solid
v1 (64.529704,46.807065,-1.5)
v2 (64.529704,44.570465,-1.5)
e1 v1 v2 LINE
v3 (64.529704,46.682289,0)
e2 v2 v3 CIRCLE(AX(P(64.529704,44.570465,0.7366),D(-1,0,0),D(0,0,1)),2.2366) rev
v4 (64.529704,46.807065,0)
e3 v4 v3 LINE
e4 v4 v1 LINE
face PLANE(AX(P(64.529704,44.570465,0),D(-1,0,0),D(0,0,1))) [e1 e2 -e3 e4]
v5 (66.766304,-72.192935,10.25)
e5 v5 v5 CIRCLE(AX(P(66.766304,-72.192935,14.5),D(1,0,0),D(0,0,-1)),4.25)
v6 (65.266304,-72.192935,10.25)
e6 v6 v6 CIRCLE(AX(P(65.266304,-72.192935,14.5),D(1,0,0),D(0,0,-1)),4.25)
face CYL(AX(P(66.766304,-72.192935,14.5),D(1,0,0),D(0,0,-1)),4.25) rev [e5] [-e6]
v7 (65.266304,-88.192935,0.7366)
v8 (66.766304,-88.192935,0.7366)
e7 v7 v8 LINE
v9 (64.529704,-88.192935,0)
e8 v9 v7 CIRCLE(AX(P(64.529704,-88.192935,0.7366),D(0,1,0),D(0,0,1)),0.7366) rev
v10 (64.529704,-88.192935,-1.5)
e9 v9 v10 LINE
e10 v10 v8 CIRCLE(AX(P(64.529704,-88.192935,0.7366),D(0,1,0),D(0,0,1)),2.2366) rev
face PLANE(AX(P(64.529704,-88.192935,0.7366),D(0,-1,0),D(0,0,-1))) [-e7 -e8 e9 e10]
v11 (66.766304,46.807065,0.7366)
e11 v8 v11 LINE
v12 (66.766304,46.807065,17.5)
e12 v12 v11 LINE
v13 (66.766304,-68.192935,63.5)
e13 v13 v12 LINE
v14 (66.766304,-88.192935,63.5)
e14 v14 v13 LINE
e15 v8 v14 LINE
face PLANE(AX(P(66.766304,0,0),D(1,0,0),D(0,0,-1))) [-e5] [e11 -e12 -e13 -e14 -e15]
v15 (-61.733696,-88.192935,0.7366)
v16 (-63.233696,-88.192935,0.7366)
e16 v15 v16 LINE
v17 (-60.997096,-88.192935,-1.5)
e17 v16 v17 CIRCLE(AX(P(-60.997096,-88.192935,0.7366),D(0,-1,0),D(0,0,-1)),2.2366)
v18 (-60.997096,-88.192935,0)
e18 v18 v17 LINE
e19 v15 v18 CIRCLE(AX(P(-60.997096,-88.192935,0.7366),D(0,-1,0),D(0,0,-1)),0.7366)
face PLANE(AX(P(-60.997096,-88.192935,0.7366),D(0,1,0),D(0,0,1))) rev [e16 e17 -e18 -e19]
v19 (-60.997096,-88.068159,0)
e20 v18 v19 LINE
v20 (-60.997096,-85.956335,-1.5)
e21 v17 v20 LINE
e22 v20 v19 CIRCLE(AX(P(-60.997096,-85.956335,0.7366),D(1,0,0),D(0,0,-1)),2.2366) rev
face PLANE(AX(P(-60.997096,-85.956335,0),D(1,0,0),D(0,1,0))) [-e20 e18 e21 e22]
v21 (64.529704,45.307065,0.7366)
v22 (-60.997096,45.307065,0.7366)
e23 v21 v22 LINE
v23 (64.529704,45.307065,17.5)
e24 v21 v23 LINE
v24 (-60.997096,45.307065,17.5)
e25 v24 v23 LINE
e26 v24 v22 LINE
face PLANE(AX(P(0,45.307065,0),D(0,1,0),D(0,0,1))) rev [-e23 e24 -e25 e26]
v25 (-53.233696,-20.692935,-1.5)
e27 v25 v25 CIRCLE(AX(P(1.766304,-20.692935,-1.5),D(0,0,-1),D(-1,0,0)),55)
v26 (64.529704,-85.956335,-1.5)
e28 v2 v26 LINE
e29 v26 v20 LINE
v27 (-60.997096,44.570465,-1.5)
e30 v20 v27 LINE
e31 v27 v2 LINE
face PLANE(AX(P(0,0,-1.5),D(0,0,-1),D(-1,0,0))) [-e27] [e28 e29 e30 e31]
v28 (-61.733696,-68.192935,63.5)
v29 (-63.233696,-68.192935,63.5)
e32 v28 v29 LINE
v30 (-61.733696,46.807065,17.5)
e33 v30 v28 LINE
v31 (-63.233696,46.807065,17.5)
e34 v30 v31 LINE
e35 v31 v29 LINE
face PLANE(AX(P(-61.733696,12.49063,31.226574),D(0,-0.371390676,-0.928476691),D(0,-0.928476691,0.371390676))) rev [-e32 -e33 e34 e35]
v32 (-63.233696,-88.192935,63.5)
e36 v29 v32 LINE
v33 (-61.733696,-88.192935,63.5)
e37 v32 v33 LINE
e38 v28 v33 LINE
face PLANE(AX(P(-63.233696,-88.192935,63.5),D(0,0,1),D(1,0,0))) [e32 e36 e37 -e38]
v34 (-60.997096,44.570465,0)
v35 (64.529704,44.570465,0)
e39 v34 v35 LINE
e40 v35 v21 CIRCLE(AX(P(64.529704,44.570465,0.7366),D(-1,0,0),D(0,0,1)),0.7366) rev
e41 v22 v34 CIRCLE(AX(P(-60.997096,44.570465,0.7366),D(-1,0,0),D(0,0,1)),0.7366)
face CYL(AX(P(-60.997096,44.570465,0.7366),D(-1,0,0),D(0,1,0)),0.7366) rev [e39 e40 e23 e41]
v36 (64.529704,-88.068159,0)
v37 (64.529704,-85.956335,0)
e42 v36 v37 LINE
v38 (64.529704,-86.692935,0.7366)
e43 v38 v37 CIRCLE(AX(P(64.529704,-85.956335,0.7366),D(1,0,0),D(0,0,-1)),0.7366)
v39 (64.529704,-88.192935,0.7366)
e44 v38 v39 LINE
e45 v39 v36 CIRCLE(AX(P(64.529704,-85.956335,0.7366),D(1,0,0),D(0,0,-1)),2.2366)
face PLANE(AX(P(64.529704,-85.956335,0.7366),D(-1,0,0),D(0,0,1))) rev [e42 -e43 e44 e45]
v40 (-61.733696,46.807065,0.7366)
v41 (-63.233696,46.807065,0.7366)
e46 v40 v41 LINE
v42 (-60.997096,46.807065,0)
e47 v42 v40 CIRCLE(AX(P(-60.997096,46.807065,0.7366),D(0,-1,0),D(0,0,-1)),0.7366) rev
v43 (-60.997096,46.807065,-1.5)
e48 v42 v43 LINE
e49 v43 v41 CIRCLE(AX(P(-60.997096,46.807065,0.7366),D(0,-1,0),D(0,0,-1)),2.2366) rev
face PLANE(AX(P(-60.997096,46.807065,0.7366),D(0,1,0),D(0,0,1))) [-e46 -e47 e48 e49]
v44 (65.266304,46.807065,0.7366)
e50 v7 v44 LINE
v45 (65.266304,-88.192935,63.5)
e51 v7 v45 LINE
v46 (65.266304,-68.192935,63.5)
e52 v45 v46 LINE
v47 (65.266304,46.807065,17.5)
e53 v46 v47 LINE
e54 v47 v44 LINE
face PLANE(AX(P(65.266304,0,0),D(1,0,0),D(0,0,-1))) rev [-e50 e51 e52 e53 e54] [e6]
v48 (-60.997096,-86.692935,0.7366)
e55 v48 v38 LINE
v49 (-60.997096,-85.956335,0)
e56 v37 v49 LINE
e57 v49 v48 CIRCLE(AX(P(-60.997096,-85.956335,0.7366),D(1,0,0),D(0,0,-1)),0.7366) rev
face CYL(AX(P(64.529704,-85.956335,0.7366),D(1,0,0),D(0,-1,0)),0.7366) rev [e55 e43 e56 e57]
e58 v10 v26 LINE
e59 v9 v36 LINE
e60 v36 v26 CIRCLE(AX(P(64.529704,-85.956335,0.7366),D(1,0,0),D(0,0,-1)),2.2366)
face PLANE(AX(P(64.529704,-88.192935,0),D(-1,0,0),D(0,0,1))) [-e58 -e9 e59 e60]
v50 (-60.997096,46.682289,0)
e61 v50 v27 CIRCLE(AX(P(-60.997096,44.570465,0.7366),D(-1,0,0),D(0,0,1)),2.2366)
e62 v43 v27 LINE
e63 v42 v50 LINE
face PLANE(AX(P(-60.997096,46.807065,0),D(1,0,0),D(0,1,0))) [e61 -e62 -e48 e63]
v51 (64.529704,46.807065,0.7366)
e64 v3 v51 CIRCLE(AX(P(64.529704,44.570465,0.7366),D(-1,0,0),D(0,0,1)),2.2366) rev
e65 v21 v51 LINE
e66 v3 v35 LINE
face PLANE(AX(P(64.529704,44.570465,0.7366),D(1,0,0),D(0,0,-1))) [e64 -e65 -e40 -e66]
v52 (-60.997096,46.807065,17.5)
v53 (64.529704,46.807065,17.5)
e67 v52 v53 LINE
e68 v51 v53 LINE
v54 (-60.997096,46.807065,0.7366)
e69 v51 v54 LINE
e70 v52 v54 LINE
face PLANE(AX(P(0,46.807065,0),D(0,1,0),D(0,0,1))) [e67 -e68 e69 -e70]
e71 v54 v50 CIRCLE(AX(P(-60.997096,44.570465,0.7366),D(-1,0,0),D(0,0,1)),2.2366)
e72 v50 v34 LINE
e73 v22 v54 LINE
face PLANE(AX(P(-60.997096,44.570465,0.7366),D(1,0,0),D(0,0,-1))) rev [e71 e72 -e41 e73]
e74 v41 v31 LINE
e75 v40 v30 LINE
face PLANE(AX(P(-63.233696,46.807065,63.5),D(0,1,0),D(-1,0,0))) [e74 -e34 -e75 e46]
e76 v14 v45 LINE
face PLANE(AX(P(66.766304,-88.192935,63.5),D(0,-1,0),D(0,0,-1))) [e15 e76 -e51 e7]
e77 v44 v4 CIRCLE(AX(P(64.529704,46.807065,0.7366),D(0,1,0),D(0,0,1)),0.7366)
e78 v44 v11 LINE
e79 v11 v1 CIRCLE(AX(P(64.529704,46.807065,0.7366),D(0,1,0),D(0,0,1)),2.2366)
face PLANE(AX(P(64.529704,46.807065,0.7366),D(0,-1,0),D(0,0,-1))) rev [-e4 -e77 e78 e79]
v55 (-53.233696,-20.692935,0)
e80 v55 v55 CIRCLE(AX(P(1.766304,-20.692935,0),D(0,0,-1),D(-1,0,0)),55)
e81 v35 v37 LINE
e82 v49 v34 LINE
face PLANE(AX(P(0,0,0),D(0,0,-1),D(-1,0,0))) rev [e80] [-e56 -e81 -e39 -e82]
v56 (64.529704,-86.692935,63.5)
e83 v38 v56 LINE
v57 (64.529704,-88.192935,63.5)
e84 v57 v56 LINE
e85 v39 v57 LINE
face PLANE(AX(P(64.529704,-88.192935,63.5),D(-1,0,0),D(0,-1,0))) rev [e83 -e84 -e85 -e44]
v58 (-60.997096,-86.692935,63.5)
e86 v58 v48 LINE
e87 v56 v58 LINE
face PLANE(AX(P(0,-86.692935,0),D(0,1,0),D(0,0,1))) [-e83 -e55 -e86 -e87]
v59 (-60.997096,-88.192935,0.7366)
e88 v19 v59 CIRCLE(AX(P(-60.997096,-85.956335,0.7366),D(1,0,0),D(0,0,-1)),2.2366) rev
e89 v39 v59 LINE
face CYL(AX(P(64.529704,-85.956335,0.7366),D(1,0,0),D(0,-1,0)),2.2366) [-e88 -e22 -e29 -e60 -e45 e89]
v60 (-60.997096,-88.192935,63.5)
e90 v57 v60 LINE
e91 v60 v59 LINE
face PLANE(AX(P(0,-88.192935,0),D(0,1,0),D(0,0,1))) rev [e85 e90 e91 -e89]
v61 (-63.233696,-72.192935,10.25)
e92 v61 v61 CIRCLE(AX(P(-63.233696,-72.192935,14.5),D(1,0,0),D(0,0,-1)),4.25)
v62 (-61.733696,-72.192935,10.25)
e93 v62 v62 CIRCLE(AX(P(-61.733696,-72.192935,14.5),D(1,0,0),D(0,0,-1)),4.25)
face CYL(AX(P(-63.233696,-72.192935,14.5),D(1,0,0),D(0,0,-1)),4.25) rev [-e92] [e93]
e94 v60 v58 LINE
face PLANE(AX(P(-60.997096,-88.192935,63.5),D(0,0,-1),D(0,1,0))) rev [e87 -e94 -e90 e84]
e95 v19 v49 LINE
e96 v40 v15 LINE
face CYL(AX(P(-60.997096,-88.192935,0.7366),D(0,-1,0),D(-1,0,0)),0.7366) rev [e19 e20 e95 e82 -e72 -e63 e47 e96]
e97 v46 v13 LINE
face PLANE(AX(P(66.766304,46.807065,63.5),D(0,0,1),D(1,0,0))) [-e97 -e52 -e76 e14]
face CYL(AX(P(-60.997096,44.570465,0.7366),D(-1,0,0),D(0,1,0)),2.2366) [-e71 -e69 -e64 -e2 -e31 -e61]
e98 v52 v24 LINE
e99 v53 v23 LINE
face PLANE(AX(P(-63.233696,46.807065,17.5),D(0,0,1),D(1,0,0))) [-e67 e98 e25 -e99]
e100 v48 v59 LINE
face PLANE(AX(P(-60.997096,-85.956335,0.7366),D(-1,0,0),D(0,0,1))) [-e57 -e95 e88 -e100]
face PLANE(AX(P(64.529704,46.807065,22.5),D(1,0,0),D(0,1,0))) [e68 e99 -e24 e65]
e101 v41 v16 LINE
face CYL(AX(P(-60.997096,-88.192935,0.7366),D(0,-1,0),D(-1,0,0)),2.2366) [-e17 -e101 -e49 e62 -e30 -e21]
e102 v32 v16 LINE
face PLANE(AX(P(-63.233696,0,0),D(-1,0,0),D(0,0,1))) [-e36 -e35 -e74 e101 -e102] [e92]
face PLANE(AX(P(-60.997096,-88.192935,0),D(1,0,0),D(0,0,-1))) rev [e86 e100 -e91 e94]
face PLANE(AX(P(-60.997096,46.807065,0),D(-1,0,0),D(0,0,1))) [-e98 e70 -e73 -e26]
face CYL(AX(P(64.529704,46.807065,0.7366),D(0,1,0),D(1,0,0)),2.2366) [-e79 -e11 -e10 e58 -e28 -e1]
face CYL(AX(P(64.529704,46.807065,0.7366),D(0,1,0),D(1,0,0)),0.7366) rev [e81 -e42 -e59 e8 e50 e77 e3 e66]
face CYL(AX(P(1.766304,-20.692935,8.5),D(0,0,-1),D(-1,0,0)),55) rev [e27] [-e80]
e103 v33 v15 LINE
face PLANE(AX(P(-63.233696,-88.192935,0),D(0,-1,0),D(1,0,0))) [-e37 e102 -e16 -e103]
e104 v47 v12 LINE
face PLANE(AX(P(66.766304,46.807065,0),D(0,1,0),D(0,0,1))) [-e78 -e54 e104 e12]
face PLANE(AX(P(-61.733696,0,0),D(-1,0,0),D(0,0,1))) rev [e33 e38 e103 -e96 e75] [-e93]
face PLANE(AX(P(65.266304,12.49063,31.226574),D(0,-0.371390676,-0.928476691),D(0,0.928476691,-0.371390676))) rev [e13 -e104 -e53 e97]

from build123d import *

# Parameters (mm, degrees)
SKETCH1_W                    = 130
SKETCH1_H                    = 135
BASE_FLANGE2_DEPTH           = 1.5
EDGE_FLANGE5_STRIP_W         = 7.4732
EDGE_FLANGE5_STRIP_H         = 1.5
EDGE_FLANGE5_STRIP_CUT_DEPTH = 135
EDGE_FLANGE5_DEPTH           = 135
EDGE_FLANGE6_STRIP_W         = 7.4732
EDGE_FLANGE6_STRIP_H         = 1.5
EDGE_FLANGE6_STRIP_CUT_DEPTH = 135
EDGE_FLANGE6_DEPTH           = 135
EDGE_FLANGE7_STRIP_W         = 7.4732
EDGE_FLANGE7_STRIP_H         = 1.5
EDGE_FLANGE7_STRIP_CUT_DEPTH = 125.5268
EDGE_FLANGE7_DEPTH           = 125.5268
CUT_EXTRUDE1_START           = -130
CUT_EXTRUDE1_OUTLINE_R       = 4.25
CUT_EXTRUDE1_DEPTH           = 130
CUT_EXTRUDE1_START_2         = -127.7634
CUT_EXTRUDE1_2_DEPTH         = 125.5268
SKETCH39_R                   = 55
CUT_EXTRUDE2_DEPTH           = 10
EDGE_FLANGE8_STRIP_W         = 7.4732
EDGE_FLANGE8_STRIP_H         = 1.5
EDGE_FLANGE8_STRIP_CUT_DEPTH = 125.5268
EDGE_FLANGE8_DEPTH           = 125.5268


# Read off the part's stored shape, not the designer's step: Cut-Extrude1
# Sheet-metal steps are written as plain solids
with BuildPart() as part:
    # Sketch1 → Base-Flange2 (new body)
    with BuildSketch(Plane.XY):
        with Locations((1.766304348, -20.692934783)):
            Rectangle(SKETCH1_W, SKETCH1_H)
    extrude(amount=-BASE_FLANGE2_DEPTH)

    # Edge-Flange5 strip (across the edge) → Edge-Flange5 strip cut (cut)
    with BuildSketch(Plane(origin=(66.766304348, -88.192934783, 0), x_dir=(-1, 0, 0), z_dir=(0, 1, 0))):
        with Locations((-1.5, -0.75)):
            Rectangle(EDGE_FLANGE5_STRIP_W, EDGE_FLANGE5_STRIP_H)
    extrude(amount=EDGE_FLANGE5_STRIP_CUT_DEPTH, mode=Mode.SUBTRACT)

    # Edge-Flange5 section (across the edge) → Edge-Flange5 (add)
    with BuildSketch(Plane(origin=(66.766304348, -88.192934783, 0), x_dir=(-1, 0, 0), z_dir=(0, 1, 0))):
        with BuildLine():
            Line((0, 0.7366), (0, 63.5))
            Line((0, 63.5), (1.5, 63.5))
            Line((1.5, 63.5), (1.5, 0.7366))
            ThreePointArc((1.5, 0.7366), (1.715745145, 0.215745145), (2.2366, 0))
            Line((2.2366, 0), (2.2366, -1.5))
            ThreePointArc((2.2366, -1.5), (0.655084973, -0.844915027), (0, 0.7366))
        make_face()
    extrude(amount=EDGE_FLANGE5_DEPTH)

    # Edge-Flange6 strip (across the edge) → Edge-Flange6 strip cut (cut)
    with BuildSketch(Plane(origin=(-63.233695652, 46.807065217, 0), x_dir=(1, 0, 0), z_dir=(0, -1, 0))):
        with Locations((-1.5, -0.75)):
            Rectangle(EDGE_FLANGE6_STRIP_W, EDGE_FLANGE6_STRIP_H)
    extrude(amount=EDGE_FLANGE6_STRIP_CUT_DEPTH, mode=Mode.SUBTRACT)

    # Edge-Flange6 section (across the edge) → Edge-Flange6 (add)
    with BuildSketch(Plane(origin=(-63.233695652, 46.807065217, 0), x_dir=(1, 0, 0), z_dir=(0, -1, 0))):
        with BuildLine():
            Line((0, 0.7366), (0, 63.5))
            Line((0, 63.5), (1.5, 63.5))
            Line((1.5, 63.5), (1.5, 0.7366))
            ThreePointArc((1.5, 0.7366), (1.715745145, 0.215745145), (2.2366, 0))
            Line((2.2366, 0), (2.2366, -1.5))
            ThreePointArc((2.2366, -1.5), (0.655084973, -0.844915027), (0, 0.7366))
        make_face()
    extrude(amount=EDGE_FLANGE6_DEPTH)

    # Edge-Flange7 strip (across the edge) → Edge-Flange7 strip cut (cut)
    with BuildSketch(Plane(origin=(64.529704348, 46.807065217, 0), x_dir=(0, -1, 0), z_dir=(-1, 0, 0))):
        with Locations((-1.5, -0.75)):
            Rectangle(EDGE_FLANGE7_STRIP_W, EDGE_FLANGE7_STRIP_H)
    extrude(amount=EDGE_FLANGE7_STRIP_CUT_DEPTH, mode=Mode.SUBTRACT)

    # Edge-Flange7 section (across the edge) → Edge-Flange7 (add)
    with BuildSketch(Plane(origin=(64.529704348, 46.807065217, 0), x_dir=(0, -1, 0), z_dir=(-1, 0, 0))):
        with BuildLine():
            Line((0, 0.7366), (0, 22.5))
            Line((0, 22.5), (1.5, 22.5))
            Line((1.5, 22.5), (1.5, 0.7366))
            ThreePointArc((1.5, 0.7366), (1.715745145, 0.215745145), (2.2366, 0))
            Line((2.2366, 0), (2.2366, -1.5))
            ThreePointArc((2.2366, -1.5), (0.655084973, -0.844915027), (0, 0.7366))
        make_face()
    extrude(amount=EDGE_FLANGE7_DEPTH)

    # Cut-Extrude1 outline → Cut-Extrude1 (cut)
    with BuildSketch(Plane(origin=(66.766304348, 0, 0), x_dir=(0, 0, -1), z_dir=(1, 0, 0)).offset(CUT_EXTRUDE1_START)):
        with Locations((-14.5, -72.192934783)):
            Circle(CUT_EXTRUDE1_OUTLINE_R)
        Polygon((-17.5, 46.807065217), (-63.5, 46.807065217), (-63.5, -68.192934783), align=None)
    extrude(amount=CUT_EXTRUDE1_DEPTH, mode=Mode.SUBTRACT)

    # Cut-Extrude1 2 outline → Cut-Extrude1 2 (cut)
    with BuildSketch(Plane(origin=(66.766304348, 0, 0), x_dir=(0, 0, -1), z_dir=(1, 0, 0)).offset(CUT_EXTRUDE1_START_2)):
        Polygon((-17.5, 45.307065217), (-17.5, 46.807065217), (-18.1, 45.307065217), align=None)
    extrude(amount=CUT_EXTRUDE1_2_DEPTH, mode=Mode.SUBTRACT)

    # Sketch39 → Cut-Extrude2 (cut)
    with BuildSketch(Plane(origin=(0, 0, -1.5), x_dir=(-1, 0, 0), z_dir=(0, 0, -1))):
        with Locations((-1.766304348, -20.692934783)):
            Circle(SKETCH39_R)
    extrude(amount=-CUT_EXTRUDE2_DEPTH, mode=Mode.SUBTRACT)

    # Edge-Flange8 strip (across the edge) → Edge-Flange8 strip cut (cut)
    with BuildSketch(Plane(origin=(-60.997095652, -88.192934783, 0), x_dir=(0, 1, 0), z_dir=(1, 0, 0))):
        with Locations((-1.5, -0.75)):
            Rectangle(EDGE_FLANGE8_STRIP_W, EDGE_FLANGE8_STRIP_H)
    extrude(amount=EDGE_FLANGE8_STRIP_CUT_DEPTH, mode=Mode.SUBTRACT)

    # Edge-Flange8 section (across the edge) → Edge-Flange8 (add)
    with BuildSketch(Plane(origin=(-60.997095652, -88.192934783, 0), x_dir=(0, 1, 0), z_dir=(1, 0, 0))):
        with BuildLine():
            Line((0, 0.7366), (0, 63.5))
            Line((0, 63.5), (1.5, 63.5))
            Line((1.5, 63.5), (1.5, 0.7366))
            ThreePointArc((1.5, 0.7366), (1.715745145, 0.215745145), (2.2366, 0))
            Line((2.2366, 0), (2.2366, -1.5))
            ThreePointArc((2.2366, -1.5), (0.655084973, -0.844915027), (0, 0.7366))
        make_face()
    extrude(amount=EDGE_FLANGE8_DEPTH)


solid = part.part
